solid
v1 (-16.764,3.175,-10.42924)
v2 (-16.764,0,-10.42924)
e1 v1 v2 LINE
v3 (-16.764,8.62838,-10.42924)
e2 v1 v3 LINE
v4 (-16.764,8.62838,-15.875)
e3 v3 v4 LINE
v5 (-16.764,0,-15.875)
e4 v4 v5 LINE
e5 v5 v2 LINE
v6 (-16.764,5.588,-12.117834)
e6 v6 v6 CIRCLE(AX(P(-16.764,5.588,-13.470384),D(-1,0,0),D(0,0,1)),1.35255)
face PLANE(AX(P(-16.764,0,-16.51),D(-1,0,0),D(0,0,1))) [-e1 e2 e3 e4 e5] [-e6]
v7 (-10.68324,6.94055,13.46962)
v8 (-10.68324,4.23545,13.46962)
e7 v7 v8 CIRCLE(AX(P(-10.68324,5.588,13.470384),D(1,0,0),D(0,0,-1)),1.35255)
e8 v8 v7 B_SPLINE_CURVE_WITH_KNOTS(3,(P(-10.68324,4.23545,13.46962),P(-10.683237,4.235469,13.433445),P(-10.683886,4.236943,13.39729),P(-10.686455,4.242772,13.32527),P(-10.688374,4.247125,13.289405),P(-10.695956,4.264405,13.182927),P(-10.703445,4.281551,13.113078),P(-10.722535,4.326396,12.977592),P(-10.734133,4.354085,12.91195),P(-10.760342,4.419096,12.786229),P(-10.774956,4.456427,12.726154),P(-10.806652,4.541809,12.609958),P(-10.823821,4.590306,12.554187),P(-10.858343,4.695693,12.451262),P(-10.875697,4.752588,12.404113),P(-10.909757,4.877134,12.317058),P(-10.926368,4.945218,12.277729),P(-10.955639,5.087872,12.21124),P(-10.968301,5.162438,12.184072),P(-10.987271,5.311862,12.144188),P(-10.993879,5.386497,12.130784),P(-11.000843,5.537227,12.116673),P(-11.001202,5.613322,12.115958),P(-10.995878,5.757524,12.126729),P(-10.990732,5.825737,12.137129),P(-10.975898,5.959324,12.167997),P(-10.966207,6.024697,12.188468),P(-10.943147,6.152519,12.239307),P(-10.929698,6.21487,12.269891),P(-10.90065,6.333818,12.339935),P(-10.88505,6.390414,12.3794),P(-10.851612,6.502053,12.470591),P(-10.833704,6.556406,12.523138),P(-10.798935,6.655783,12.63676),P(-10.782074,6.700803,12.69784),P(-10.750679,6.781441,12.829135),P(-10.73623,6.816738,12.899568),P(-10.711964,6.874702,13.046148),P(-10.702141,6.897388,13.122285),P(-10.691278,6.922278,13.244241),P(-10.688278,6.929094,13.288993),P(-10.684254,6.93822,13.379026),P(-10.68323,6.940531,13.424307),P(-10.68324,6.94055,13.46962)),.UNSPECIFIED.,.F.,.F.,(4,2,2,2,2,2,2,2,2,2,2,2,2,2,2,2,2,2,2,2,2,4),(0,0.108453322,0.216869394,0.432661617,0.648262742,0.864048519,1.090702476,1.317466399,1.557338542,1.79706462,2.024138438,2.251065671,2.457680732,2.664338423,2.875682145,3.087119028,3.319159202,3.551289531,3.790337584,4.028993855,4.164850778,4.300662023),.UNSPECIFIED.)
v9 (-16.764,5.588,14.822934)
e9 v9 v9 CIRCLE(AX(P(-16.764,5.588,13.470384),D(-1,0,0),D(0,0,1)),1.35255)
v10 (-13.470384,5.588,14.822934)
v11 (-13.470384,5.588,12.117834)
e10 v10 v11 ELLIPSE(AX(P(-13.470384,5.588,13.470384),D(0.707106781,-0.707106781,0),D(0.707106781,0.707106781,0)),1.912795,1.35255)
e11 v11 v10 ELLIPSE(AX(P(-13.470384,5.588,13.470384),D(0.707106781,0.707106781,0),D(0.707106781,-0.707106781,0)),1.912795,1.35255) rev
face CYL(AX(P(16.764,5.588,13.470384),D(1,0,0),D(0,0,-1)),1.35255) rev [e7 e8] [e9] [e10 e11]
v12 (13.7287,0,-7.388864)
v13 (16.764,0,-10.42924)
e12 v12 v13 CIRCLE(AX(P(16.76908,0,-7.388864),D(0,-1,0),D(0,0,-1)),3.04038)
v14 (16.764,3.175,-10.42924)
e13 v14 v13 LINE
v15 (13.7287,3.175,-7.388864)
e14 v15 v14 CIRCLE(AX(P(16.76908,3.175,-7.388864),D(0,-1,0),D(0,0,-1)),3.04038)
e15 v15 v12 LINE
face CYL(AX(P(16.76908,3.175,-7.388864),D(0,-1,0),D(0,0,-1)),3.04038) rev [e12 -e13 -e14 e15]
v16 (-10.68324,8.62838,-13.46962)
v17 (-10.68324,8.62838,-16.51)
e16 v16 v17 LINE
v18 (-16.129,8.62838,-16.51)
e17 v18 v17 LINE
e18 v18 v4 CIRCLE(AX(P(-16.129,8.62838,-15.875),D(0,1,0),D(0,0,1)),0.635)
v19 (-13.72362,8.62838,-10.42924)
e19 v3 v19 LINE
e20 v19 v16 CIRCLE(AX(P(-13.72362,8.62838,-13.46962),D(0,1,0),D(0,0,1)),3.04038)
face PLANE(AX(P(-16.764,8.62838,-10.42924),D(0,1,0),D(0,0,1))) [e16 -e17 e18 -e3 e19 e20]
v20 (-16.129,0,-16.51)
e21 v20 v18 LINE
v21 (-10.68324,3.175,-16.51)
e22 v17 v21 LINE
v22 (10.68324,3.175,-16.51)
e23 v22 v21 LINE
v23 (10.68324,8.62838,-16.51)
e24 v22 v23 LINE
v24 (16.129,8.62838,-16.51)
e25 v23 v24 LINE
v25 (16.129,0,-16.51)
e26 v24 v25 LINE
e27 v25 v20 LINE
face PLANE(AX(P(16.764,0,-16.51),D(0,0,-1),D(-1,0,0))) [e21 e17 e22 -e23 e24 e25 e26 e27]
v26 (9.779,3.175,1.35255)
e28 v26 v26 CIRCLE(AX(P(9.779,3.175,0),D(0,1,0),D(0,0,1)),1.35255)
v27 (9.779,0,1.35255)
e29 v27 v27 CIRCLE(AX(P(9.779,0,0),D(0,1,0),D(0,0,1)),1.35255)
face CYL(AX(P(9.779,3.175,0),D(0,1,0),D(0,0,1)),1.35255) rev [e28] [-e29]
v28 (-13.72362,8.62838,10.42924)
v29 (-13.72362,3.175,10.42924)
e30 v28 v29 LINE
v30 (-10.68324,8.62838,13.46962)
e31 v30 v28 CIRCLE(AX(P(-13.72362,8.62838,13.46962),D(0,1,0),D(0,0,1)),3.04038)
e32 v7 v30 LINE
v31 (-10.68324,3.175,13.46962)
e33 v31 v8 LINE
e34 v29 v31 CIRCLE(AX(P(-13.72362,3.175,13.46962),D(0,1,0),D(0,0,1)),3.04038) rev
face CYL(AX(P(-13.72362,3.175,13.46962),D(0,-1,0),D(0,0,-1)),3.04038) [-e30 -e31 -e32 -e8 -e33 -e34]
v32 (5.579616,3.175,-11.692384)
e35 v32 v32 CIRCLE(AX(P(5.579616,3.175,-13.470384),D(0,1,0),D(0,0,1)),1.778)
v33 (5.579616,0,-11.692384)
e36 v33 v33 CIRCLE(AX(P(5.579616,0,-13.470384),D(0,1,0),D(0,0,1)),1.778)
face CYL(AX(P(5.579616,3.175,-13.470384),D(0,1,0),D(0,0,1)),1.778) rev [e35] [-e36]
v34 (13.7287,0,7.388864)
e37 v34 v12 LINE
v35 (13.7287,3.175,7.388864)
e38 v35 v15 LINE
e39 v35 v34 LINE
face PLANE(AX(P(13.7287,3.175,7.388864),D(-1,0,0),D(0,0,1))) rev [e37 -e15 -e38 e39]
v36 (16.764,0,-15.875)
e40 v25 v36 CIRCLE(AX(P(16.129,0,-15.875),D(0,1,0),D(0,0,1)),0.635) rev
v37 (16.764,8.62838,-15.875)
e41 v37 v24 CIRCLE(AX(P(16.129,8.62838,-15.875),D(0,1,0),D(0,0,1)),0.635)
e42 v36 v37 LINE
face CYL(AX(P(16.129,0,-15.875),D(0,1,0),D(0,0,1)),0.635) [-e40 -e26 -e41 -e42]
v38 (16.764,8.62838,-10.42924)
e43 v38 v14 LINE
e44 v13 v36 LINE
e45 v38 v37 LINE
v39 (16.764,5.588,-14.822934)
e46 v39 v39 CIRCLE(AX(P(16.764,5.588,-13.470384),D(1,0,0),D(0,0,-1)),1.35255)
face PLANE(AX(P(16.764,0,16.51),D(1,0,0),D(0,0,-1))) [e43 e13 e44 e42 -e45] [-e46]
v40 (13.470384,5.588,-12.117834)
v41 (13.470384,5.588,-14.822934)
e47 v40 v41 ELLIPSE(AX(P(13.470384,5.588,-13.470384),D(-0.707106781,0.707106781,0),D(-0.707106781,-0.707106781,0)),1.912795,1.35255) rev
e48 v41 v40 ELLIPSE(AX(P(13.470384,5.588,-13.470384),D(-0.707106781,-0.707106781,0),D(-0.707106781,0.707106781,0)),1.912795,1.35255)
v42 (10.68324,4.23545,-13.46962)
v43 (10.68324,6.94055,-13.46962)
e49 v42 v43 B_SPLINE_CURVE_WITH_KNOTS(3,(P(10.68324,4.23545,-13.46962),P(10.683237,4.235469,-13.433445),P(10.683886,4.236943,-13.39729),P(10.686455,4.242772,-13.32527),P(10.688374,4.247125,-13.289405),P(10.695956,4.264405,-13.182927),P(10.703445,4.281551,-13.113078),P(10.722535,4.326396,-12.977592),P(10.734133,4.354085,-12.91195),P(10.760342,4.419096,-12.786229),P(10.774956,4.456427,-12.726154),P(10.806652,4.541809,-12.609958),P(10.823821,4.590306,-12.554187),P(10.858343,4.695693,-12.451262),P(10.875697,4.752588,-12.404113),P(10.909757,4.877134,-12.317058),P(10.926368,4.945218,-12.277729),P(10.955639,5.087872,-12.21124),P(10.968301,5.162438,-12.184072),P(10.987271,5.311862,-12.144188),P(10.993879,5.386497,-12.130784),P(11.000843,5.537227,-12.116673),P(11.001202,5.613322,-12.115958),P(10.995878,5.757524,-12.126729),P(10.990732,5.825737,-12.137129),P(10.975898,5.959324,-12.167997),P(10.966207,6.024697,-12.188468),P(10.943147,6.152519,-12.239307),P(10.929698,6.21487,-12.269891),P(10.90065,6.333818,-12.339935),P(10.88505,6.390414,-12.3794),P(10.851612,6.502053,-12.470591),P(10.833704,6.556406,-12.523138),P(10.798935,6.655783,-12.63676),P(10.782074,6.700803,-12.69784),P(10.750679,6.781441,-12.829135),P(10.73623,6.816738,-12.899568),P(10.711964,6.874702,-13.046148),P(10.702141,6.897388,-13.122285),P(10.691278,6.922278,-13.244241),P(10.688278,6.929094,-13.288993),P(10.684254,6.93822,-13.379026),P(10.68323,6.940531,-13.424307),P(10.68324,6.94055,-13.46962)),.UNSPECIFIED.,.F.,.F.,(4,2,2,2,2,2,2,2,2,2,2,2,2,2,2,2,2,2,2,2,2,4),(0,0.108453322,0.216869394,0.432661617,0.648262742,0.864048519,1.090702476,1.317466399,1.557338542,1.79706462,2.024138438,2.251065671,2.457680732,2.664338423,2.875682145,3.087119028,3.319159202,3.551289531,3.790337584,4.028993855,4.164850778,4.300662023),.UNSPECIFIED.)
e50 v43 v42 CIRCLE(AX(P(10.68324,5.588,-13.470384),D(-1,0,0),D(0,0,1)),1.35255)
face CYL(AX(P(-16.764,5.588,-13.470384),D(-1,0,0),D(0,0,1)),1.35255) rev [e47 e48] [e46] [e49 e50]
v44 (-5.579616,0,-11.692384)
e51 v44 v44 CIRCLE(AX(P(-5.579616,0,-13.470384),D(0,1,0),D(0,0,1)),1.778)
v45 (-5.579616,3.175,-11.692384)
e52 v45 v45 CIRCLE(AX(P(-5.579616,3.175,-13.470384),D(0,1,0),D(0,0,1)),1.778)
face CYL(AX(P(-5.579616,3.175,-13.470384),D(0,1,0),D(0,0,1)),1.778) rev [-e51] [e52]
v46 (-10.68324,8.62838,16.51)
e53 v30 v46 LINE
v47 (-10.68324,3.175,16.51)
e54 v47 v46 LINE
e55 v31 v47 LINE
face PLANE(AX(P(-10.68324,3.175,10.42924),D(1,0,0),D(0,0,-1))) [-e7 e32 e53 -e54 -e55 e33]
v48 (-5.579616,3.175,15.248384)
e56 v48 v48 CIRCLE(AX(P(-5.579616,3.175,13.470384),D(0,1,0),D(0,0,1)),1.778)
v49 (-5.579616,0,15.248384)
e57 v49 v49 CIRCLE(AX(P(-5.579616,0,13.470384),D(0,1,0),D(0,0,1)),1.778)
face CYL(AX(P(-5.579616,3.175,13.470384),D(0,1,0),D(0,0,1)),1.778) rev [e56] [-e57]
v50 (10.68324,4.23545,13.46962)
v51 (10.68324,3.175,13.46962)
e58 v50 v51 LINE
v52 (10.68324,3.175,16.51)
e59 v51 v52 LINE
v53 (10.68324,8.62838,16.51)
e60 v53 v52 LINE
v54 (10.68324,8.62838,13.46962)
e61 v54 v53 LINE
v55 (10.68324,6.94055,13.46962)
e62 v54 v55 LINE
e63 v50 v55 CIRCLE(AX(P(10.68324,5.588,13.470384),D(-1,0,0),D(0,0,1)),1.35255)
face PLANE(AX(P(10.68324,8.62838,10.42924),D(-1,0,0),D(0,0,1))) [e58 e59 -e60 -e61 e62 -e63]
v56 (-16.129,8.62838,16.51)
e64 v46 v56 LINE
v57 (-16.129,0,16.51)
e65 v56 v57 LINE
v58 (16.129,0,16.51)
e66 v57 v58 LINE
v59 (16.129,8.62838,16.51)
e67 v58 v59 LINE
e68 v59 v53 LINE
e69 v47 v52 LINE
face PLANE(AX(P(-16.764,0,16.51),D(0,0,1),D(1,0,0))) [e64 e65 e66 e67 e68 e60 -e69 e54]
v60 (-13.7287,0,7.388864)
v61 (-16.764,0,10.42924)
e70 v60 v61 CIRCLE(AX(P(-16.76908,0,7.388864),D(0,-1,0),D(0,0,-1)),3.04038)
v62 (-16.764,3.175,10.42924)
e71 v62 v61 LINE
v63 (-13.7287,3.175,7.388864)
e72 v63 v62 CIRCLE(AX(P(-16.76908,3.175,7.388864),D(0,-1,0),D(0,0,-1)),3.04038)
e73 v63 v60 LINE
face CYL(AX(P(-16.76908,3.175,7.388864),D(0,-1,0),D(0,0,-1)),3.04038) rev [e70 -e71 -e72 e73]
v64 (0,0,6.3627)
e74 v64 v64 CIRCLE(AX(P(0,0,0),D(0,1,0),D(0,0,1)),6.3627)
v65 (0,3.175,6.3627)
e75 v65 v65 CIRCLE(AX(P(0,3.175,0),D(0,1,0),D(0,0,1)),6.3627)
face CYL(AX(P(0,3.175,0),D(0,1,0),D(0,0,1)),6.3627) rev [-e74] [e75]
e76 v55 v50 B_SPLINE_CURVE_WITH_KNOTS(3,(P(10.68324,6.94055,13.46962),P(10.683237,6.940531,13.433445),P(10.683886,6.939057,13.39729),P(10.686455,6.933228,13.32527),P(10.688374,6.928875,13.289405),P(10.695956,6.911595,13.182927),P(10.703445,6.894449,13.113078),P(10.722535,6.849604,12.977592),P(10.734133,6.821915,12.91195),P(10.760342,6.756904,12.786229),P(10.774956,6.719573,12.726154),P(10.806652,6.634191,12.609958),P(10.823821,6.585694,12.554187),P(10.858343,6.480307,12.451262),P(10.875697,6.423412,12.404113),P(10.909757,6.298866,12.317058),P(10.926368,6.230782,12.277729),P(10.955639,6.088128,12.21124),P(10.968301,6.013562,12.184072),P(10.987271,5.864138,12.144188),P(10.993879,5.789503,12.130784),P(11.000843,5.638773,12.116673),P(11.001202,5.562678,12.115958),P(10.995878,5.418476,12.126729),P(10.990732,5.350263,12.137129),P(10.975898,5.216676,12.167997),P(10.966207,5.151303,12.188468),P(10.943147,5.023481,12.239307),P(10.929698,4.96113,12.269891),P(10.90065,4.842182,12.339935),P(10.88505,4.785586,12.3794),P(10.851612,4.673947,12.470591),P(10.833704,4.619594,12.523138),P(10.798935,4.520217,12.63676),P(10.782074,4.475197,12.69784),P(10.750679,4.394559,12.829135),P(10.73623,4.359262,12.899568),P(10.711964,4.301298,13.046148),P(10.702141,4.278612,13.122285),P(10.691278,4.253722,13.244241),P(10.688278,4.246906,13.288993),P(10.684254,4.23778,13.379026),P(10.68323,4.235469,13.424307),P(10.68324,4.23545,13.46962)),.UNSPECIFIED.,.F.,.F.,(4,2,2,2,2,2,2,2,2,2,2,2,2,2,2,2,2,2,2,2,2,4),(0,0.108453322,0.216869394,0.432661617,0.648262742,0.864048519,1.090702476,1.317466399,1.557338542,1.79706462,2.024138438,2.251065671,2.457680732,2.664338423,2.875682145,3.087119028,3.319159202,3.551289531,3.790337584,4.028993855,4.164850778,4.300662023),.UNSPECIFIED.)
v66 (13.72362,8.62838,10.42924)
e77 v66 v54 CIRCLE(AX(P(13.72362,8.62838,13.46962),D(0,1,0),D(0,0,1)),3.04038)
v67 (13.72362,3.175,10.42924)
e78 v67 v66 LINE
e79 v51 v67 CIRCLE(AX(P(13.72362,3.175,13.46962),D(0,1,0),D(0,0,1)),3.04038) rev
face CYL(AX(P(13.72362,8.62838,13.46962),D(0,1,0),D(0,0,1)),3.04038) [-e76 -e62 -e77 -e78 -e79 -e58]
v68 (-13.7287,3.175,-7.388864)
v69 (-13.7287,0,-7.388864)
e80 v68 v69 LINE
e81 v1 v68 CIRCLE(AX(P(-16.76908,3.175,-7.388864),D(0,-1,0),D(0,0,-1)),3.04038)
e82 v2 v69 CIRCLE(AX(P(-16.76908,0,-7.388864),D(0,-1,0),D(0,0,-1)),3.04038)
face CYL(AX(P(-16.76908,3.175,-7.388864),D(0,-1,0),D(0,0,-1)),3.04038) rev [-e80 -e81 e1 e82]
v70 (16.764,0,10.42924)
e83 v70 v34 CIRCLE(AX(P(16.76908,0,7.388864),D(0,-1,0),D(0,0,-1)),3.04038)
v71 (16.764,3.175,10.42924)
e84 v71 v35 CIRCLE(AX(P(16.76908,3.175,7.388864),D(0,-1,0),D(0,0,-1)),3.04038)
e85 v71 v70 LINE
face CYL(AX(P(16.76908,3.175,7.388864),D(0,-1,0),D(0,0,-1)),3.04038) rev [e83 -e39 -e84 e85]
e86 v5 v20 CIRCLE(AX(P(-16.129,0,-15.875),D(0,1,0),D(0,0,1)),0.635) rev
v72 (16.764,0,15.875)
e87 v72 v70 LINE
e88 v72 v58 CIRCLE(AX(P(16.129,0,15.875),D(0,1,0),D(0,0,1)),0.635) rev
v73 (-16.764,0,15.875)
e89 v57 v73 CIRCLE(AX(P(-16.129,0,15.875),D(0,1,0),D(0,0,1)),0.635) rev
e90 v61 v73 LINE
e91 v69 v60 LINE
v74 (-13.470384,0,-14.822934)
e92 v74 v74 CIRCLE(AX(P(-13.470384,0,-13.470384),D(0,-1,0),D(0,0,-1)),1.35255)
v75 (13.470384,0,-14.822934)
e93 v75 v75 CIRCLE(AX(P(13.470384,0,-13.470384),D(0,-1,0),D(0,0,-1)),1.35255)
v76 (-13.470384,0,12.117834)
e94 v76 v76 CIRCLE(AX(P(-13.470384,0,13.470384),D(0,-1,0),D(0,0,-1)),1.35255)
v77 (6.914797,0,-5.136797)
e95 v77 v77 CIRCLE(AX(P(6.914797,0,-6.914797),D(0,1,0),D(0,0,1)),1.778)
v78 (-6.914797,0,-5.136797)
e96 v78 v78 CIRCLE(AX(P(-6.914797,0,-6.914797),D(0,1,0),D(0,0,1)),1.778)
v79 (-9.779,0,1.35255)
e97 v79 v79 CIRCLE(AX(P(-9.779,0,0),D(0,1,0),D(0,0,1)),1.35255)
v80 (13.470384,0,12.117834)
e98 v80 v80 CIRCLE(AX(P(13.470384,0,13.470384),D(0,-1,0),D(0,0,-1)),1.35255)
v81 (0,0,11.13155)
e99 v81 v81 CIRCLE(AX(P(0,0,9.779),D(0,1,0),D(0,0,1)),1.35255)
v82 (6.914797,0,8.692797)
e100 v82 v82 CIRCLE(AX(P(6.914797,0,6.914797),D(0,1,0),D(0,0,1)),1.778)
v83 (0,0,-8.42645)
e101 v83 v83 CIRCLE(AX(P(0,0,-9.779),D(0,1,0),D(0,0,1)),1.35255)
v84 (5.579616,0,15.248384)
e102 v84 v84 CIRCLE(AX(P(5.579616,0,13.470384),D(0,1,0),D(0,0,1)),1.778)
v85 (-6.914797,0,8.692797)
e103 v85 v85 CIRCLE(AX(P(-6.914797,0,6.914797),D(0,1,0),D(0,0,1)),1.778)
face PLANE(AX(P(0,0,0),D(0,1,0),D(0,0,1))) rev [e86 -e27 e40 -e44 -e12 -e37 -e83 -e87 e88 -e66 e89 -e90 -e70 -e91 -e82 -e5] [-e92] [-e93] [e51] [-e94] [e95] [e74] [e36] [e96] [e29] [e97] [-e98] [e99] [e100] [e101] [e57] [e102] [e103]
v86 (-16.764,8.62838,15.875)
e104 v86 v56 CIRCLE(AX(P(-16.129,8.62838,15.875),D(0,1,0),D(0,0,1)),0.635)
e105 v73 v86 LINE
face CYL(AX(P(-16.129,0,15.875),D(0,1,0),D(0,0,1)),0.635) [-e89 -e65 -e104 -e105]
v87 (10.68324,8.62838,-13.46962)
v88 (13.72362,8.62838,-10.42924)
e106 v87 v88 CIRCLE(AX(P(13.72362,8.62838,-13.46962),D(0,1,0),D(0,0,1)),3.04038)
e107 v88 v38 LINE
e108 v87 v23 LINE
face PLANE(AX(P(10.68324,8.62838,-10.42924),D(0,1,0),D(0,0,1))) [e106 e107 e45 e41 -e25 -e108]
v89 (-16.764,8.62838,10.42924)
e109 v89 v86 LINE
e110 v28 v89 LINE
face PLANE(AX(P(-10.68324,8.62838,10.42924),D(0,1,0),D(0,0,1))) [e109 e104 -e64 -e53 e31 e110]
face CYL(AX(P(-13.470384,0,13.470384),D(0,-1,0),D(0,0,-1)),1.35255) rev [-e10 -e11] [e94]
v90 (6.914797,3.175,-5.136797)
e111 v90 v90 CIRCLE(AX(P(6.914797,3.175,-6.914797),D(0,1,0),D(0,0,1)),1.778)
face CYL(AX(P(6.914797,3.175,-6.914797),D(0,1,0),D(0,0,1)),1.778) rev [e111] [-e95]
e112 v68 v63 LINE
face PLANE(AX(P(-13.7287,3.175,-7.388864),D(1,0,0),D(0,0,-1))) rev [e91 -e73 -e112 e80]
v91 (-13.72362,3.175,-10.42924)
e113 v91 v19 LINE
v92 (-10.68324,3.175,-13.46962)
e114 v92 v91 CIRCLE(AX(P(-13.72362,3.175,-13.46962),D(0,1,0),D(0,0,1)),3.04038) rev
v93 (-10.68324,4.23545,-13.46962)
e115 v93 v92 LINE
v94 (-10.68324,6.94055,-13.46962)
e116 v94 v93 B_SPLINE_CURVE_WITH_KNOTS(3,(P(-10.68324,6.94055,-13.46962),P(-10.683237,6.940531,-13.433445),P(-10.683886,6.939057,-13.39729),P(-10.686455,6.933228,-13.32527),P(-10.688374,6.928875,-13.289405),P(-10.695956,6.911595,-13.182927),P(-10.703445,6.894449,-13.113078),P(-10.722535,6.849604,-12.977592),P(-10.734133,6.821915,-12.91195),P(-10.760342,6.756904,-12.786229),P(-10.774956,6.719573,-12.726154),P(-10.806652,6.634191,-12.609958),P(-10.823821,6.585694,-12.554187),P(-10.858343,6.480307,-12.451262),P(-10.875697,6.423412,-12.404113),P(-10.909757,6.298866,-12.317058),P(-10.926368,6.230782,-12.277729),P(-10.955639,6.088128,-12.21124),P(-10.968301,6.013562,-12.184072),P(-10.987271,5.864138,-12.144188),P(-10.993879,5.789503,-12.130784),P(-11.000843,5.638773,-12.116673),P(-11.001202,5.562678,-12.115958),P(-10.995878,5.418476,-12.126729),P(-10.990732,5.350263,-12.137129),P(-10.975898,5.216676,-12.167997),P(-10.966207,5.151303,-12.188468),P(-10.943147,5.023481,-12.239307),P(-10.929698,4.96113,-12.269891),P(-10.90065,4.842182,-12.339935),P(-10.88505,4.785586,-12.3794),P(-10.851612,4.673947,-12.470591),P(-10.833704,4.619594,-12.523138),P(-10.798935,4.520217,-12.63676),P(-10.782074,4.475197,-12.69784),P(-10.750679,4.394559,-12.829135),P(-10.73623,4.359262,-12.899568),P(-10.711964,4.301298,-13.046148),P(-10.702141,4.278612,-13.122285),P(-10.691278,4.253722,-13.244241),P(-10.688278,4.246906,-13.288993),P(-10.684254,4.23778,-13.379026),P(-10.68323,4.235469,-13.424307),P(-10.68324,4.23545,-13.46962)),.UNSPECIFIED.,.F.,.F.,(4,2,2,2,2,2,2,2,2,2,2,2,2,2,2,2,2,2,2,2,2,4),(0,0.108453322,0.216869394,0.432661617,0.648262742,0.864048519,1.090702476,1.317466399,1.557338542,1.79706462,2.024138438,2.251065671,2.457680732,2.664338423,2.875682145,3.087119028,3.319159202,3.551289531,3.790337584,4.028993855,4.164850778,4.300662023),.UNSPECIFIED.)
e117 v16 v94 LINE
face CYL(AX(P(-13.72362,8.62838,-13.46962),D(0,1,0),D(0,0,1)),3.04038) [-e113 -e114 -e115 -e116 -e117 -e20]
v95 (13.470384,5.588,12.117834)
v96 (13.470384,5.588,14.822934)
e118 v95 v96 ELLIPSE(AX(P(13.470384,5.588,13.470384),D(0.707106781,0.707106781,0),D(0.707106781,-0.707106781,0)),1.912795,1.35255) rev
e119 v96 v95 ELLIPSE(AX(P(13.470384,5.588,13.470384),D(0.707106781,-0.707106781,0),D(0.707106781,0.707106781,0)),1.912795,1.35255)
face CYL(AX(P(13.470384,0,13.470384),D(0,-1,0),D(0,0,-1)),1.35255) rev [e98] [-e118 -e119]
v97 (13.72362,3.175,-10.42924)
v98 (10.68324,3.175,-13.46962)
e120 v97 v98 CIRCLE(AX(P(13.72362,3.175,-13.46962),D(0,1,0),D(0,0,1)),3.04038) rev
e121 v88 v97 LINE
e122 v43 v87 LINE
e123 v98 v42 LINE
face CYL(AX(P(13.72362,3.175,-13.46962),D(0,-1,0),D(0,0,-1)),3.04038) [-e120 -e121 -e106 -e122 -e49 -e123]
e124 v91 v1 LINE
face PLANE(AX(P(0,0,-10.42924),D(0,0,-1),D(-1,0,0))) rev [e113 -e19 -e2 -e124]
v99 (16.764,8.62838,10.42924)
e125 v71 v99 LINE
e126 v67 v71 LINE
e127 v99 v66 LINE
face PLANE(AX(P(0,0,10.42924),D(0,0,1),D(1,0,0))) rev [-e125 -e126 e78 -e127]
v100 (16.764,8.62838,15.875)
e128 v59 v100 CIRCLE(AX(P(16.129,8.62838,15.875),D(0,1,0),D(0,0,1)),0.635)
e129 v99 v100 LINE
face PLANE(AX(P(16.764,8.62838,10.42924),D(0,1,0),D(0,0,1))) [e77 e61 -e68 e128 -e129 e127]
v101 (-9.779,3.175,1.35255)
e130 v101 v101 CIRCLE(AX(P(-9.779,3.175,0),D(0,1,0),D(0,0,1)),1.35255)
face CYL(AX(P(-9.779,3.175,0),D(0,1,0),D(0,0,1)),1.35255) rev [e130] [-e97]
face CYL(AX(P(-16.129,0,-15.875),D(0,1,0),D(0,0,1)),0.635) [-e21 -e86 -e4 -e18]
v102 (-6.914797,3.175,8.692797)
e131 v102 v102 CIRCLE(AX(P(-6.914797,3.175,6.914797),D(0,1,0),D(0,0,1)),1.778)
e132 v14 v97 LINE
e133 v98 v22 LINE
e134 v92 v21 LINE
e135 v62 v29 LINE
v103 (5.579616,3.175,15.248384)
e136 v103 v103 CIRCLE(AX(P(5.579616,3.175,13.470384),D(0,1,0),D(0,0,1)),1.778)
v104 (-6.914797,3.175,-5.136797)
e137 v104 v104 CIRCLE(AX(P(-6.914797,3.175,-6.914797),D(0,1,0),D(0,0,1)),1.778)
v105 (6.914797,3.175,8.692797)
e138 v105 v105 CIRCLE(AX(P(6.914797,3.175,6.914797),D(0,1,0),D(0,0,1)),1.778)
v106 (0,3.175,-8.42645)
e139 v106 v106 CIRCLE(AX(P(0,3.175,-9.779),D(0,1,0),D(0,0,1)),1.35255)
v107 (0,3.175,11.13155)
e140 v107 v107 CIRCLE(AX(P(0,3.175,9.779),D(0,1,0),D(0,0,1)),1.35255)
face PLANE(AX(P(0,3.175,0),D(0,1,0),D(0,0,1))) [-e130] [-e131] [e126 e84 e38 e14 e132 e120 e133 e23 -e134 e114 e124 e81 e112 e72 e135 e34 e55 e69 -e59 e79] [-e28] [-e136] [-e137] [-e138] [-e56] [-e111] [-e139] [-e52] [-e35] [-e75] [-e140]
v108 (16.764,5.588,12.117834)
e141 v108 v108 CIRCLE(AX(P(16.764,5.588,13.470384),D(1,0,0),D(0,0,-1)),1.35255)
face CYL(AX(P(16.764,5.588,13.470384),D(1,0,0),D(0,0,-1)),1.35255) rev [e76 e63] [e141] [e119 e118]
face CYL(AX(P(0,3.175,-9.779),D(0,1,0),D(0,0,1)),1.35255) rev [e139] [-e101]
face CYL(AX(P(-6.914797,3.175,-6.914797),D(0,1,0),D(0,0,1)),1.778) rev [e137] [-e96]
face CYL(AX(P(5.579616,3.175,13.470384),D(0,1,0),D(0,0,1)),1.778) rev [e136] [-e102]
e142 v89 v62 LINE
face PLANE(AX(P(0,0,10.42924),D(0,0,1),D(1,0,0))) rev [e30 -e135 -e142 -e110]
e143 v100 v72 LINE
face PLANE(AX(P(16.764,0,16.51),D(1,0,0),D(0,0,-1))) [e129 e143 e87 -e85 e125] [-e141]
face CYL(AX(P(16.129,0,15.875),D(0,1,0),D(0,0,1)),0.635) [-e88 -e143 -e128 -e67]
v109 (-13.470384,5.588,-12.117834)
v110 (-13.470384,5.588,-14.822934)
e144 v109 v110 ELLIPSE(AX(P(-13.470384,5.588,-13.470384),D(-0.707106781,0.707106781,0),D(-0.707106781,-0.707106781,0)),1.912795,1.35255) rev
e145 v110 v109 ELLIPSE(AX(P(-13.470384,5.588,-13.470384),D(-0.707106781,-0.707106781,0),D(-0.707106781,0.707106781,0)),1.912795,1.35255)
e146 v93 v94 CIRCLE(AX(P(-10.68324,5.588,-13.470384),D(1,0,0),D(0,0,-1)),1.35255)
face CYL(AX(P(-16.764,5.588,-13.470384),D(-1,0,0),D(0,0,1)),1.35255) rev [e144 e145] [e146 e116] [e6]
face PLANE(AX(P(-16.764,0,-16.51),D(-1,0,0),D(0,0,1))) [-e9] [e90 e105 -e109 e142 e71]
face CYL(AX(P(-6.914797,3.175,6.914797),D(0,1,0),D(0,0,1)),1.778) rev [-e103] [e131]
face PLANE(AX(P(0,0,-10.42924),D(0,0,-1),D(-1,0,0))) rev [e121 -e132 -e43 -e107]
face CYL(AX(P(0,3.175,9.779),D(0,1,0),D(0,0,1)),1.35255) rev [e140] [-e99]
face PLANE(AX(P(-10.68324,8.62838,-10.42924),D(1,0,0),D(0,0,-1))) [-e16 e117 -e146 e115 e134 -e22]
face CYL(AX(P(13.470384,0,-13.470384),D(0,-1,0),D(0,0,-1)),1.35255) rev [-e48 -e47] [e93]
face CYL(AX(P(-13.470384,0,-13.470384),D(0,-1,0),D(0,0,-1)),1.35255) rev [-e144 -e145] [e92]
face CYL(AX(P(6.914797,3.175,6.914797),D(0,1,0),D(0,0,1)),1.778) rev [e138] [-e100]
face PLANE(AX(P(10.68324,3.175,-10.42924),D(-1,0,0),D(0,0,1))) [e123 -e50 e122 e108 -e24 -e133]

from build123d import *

# Parameters (mm, degrees)
SKETCH1_W                   = 33.528
SKETCH1_H                   = 33.02
BOSS_EXTRUDE1_DEPTH         = 3.175
CUT_EXTRUDE1_DEPTH          = 24.742207585
CUT_EXTRUDE2_DEPTH          = 24.742207585
SKETCH4_W                   = 6.08076
SKETCH4_H                   = 5.45338
BOSS_EXTRUDE2_DEPTH         = 6.08076
SKETCH5_W                   = 6.08076
SKETCH5_H                   = 5.45338
BOSS_EXTRUDE3_DEPTH         = 6.08076
SKETCH6_W                   = 6.08076
SKETCH6_H                   = 5.45338
BOSS_EXTRUDE4_DEPTH         = 6.08076
SKETCH7_W                   = 6.08076
SKETCH7_H                   = 5.45338
BOSS_EXTRUDE5_DEPTH         = 6.08076
HOLE1_D                     = 12.7254
M2_5_CLEARANCE_HOLE1_D      = 2.7051
M3_CLEARANCE_HOLE1_D        = 3.556
M2_5_CLEARANCE_HOLE2_D      = 2.7051
M2_5_CLEARANCE_HOLE2_DEPTH  = 39.60876
M2_5_CLEARANCE_HOLE3_D      = 2.7051
M2_5_CLEARANCE_HOLE3_DEPTH  = 39.60876
M2_5_CLEARANCE_HOLE4_REACH  = 27.061
M2_5_CLEARANCE_HOLE4_BORE_R = 1.35255
FILLET1_R                   = 0.635
FILLET2_R                   = 3.04038


with BuildPart() as part:
    # Sketch1 → Boss-Extrude1 (new body)
    with BuildSketch(Plane(origin=(0, 3.175, 0), x_dir=(1, 0, 0), z_dir=(0, 1, 0))):
        Rectangle(SKETCH1_W, SKETCH1_H)
    extrude(amount=-BOSS_EXTRUDE1_DEPTH)

    # Sketch2 → Cut-Extrude1 (cut, through all)
    with BuildSketch(Plane.XZ):
        with BuildLine():
            Line((16.764, -10.42924), (16.764, 10.42924))
            ThreePointArc((16.764, 10.42924), (14.617411383, 9.536940757), (13.7287, 7.388864244))
            Line((13.7287, 7.388864244), (13.7287, -7.388864244))
            ThreePointArc((13.7287, -7.388864244), (14.617411383, -9.536940757), (16.764, -10.42924))
        make_face()
    extrude(amount=-CUT_EXTRUDE1_DEPTH, mode=Mode.SUBTRACT)

    # Sketch3 → Cut-Extrude2 (cut, through all)
    with BuildSketch(Plane.XZ):
        with BuildLine():
            Line((-16.764, 10.42924), (-16.764, -10.42924))
            ThreePointArc((-16.764, -10.42924), (-14.617411383, -9.536940757), (-13.7287, -7.388864244))
            Line((-13.7287, -7.388864244), (-13.7287, 7.388864244))
            ThreePointArc((-13.7287, 7.388864244), (-14.617411383, 9.536940757), (-16.764, 10.42924))
        make_face()
    extrude(amount=-CUT_EXTRUDE2_DEPTH, mode=Mode.SUBTRACT)

    # Sketch4 → Boss-Extrude2 (add)
    with BuildSketch(Plane(origin=(0, 0, -16.51), x_dir=(-1, 0, 0), z_dir=(0, 0, -1))):
        with Locations((13.72362, 5.90169)):
            Rectangle(SKETCH4_W, SKETCH4_H)
    extrude(amount=-BOSS_EXTRUDE2_DEPTH)

    # Sketch5 → Boss-Extrude3 (add)
    with BuildSketch(Plane(origin=(0, 0, -16.51), x_dir=(-1, 0, 0), z_dir=(0, 0, -1))):
        with Locations((-13.72362, 5.90169)):
            Rectangle(SKETCH5_W, SKETCH5_H)
    extrude(amount=-BOSS_EXTRUDE3_DEPTH)

    # Sketch6 → Boss-Extrude4 (add)
    with BuildSketch(Plane.XY.offset(16.51)):
        with Locations((13.72362, 5.90169)):
            Rectangle(SKETCH6_W, SKETCH6_H)
    extrude(amount=-BOSS_EXTRUDE4_DEPTH)

    # Sketch7 → Boss-Extrude5 (add)
    with BuildSketch(Plane.XY.offset(16.51)):
        with Locations((-13.72362, 5.90169)):
            Rectangle(SKETCH7_W, SKETCH7_H)
    extrude(amount=-BOSS_EXTRUDE5_DEPTH)

    # Hole1 (through all)
    with Locations(Plane(origin=(0, 3.175, 0), x_dir=(1, 0, 0), z_dir=(0, 1, 0))):
        with Locations((0, 0)):
            Hole(HOLE1_D / 2)

    # M2.5 Clearance Hole1 (through all)
    with Locations(Plane(origin=(0, 3.175, 0), x_dir=(1, 0, 0), z_dir=(0, 1, 0))):
        with Locations((0, 9.779), (-9.779, 0), (0, -9.779), (9.779, 0)):
            Hole(M2_5_CLEARANCE_HOLE1_D / 2)

    # M3 Clearance Hole1 (through all)
    with Locations(Plane(origin=(0, 3.175, 0), x_dir=(1, 0, 0), z_dir=(0, 1, 0))):
        with Locations((-5.579615818, -13.470384182), (5.579615818, -13.470384182), (5.579615818, 13.470384182), (-5.579615818, 13.470384182), (6.914797213, 6.914797213), (-6.914797213, 6.914797213), (-6.914797213, -6.914797213), (6.914797213, -6.914797213)):
            Hole(M3_CLEARANCE_HOLE1_D / 2)

    # M2.5 Clearance Hole2
    with Locations(Plane(origin=(16.764, 0, 0), x_dir=(0, 0, -1), z_dir=(1, 0, 0))):
        with Locations((-13.470384182, 5.588)):
            Hole(M2_5_CLEARANCE_HOLE2_D / 2, depth=M2_5_CLEARANCE_HOLE2_DEPTH)

    # M2.5 Clearance Hole3
    with Locations(Plane.ZY.offset(16.764)):
        with Locations((-13.470384182, 5.588)):
            Hole(M2_5_CLEARANCE_HOLE3_D / 2, depth=M2_5_CLEARANCE_HOLE3_DEPTH)

    # M2.5 Clearance Hole4 bore → M2.5 Clearance Hole4 (cut, up to next)
    with BuildSketch(Plane(origin=(0, 0, 0), x_dir=(-1, 0, 0), z_dir=(0, -1, 0)), mode=Mode.PRIVATE) as m2_5_clearance_hole4_sk1:
        with Locations((13.470384182, 13.470384182)):
            Circle(M2_5_CLEARANCE_HOLE4_BORE_R)
    m2_5_clearance_hole4_tool1 = extrude(m2_5_clearance_hole4_sk1.sketch, amount=-M2_5_CLEARANCE_HOLE4_REACH, mode=Mode.PRIVATE) & part.part
    # M2.5 Clearance Hole4 bore → M2.5 Clearance Hole4 (cut, up to next)
    with BuildSketch(Plane(origin=(0, 0, 0), x_dir=(-1, 0, 0), z_dir=(0, -1, 0)), mode=Mode.PRIVATE) as m2_5_clearance_hole4_sk2:
        with Locations((-13.470384182, 13.470384182)):
            Circle(M2_5_CLEARANCE_HOLE4_BORE_R)
    m2_5_clearance_hole4_tool2 = extrude(m2_5_clearance_hole4_sk2.sketch, amount=-M2_5_CLEARANCE_HOLE4_REACH, mode=Mode.PRIVATE) & part.part
    # M2.5 Clearance Hole4 bore → M2.5 Clearance Hole4 (cut, up to next)
    with BuildSketch(Plane(origin=(0, 0, 0), x_dir=(-1, 0, 0), z_dir=(0, -1, 0)), mode=Mode.PRIVATE) as m2_5_clearance_hole4_sk3:
        with Locations((-13.470384182, -13.470384182)):
            Circle(M2_5_CLEARANCE_HOLE4_BORE_R)
    m2_5_clearance_hole4_tool3 = extrude(m2_5_clearance_hole4_sk3.sketch, amount=-M2_5_CLEARANCE_HOLE4_REACH, mode=Mode.PRIVATE) & part.part
    # M2.5 Clearance Hole4 bore → M2.5 Clearance Hole4 (cut, up to next)
    with BuildSketch(Plane(origin=(0, 0, 0), x_dir=(-1, 0, 0), z_dir=(0, -1, 0)), mode=Mode.PRIVATE) as m2_5_clearance_hole4_sk4:
        with Locations((13.470384182, -13.470384182)):
            Circle(M2_5_CLEARANCE_HOLE4_BORE_R)
    m2_5_clearance_hole4_tool4 = extrude(m2_5_clearance_hole4_sk4.sketch, amount=-M2_5_CLEARANCE_HOLE4_REACH, mode=Mode.PRIVATE) & part.part
    add(m2_5_clearance_hole4_tool1.solids().sort_by_distance((-13.470384, 0, -13.470384))[0], mode=Mode.SUBTRACT)
    add(m2_5_clearance_hole4_tool2.solids().sort_by_distance((13.470384, 0, -13.470384))[0], mode=Mode.SUBTRACT)
    add(m2_5_clearance_hole4_tool3.solids().sort_by_distance((13.470384, 0, 13.470384))[0], mode=Mode.SUBTRACT)
    add(m2_5_clearance_hole4_tool4.solids().sort_by_distance((-13.470384, 0, 13.470384))[0], mode=Mode.SUBTRACT)

    # Fillet1
    fillet1_edges = [part.edges().sort_by_distance(p)[0] for p in [
        (-16.764, 4.31419, 16.51),
        (-16.764, 4.31419, -16.51),
        (16.764, 4.31419, -16.51),
        (16.764, 4.31419, 16.51),
    ]]
    fillet(fillet1_edges, radius=FILLET1_R)

    # Fillet2
    # the kernel refuses this fillet: 3.04038 mm, written as the material it takes off along each edge
    with BuildSketch(Plane(origin=(-10.68324, 16.22933, -10.42924), x_dir=(-1, 0, 0), z_dir=(0, -1, 0)), Plane(origin=(10.68324, 16.22933, 10.42924), x_dir=(1, 0, 0), z_dir=(0, -1, 0)), Plane(origin=(-10.68324, 3.175, 10.42924), x_dir=(-1, 0, 0), z_dir=(0, 1, 0))) as fillet2_piece_1:
        with BuildLine():
            CenterArc((FILLET2_R, FILLET2_R), FILLET2_R, 180, 90)
            Line((0, FILLET2_R), (0, 0))
            Line((0, 0), (FILLET2_R, 0))
        make_face()
    extrude(amount=13.05433, mode=Mode.SUBTRACT)
    with BuildSketch(Plane(origin=(10.68324, 3.175, -10.42924), x_dir=(0, 0, -1), z_dir=(0, 1, 0))) as fillet2_piece_2:
        with BuildLine():
            CenterArc((FILLET2_R, -FILLET2_R), FILLET2_R, 90, 90)
            Line((0, -FILLET2_R), (0, 0))
            Line((0, 0), (FILLET2_R, 0))
        make_face()
    extrude(amount=13.05433, mode=Mode.SUBTRACT)


solid = part.part
